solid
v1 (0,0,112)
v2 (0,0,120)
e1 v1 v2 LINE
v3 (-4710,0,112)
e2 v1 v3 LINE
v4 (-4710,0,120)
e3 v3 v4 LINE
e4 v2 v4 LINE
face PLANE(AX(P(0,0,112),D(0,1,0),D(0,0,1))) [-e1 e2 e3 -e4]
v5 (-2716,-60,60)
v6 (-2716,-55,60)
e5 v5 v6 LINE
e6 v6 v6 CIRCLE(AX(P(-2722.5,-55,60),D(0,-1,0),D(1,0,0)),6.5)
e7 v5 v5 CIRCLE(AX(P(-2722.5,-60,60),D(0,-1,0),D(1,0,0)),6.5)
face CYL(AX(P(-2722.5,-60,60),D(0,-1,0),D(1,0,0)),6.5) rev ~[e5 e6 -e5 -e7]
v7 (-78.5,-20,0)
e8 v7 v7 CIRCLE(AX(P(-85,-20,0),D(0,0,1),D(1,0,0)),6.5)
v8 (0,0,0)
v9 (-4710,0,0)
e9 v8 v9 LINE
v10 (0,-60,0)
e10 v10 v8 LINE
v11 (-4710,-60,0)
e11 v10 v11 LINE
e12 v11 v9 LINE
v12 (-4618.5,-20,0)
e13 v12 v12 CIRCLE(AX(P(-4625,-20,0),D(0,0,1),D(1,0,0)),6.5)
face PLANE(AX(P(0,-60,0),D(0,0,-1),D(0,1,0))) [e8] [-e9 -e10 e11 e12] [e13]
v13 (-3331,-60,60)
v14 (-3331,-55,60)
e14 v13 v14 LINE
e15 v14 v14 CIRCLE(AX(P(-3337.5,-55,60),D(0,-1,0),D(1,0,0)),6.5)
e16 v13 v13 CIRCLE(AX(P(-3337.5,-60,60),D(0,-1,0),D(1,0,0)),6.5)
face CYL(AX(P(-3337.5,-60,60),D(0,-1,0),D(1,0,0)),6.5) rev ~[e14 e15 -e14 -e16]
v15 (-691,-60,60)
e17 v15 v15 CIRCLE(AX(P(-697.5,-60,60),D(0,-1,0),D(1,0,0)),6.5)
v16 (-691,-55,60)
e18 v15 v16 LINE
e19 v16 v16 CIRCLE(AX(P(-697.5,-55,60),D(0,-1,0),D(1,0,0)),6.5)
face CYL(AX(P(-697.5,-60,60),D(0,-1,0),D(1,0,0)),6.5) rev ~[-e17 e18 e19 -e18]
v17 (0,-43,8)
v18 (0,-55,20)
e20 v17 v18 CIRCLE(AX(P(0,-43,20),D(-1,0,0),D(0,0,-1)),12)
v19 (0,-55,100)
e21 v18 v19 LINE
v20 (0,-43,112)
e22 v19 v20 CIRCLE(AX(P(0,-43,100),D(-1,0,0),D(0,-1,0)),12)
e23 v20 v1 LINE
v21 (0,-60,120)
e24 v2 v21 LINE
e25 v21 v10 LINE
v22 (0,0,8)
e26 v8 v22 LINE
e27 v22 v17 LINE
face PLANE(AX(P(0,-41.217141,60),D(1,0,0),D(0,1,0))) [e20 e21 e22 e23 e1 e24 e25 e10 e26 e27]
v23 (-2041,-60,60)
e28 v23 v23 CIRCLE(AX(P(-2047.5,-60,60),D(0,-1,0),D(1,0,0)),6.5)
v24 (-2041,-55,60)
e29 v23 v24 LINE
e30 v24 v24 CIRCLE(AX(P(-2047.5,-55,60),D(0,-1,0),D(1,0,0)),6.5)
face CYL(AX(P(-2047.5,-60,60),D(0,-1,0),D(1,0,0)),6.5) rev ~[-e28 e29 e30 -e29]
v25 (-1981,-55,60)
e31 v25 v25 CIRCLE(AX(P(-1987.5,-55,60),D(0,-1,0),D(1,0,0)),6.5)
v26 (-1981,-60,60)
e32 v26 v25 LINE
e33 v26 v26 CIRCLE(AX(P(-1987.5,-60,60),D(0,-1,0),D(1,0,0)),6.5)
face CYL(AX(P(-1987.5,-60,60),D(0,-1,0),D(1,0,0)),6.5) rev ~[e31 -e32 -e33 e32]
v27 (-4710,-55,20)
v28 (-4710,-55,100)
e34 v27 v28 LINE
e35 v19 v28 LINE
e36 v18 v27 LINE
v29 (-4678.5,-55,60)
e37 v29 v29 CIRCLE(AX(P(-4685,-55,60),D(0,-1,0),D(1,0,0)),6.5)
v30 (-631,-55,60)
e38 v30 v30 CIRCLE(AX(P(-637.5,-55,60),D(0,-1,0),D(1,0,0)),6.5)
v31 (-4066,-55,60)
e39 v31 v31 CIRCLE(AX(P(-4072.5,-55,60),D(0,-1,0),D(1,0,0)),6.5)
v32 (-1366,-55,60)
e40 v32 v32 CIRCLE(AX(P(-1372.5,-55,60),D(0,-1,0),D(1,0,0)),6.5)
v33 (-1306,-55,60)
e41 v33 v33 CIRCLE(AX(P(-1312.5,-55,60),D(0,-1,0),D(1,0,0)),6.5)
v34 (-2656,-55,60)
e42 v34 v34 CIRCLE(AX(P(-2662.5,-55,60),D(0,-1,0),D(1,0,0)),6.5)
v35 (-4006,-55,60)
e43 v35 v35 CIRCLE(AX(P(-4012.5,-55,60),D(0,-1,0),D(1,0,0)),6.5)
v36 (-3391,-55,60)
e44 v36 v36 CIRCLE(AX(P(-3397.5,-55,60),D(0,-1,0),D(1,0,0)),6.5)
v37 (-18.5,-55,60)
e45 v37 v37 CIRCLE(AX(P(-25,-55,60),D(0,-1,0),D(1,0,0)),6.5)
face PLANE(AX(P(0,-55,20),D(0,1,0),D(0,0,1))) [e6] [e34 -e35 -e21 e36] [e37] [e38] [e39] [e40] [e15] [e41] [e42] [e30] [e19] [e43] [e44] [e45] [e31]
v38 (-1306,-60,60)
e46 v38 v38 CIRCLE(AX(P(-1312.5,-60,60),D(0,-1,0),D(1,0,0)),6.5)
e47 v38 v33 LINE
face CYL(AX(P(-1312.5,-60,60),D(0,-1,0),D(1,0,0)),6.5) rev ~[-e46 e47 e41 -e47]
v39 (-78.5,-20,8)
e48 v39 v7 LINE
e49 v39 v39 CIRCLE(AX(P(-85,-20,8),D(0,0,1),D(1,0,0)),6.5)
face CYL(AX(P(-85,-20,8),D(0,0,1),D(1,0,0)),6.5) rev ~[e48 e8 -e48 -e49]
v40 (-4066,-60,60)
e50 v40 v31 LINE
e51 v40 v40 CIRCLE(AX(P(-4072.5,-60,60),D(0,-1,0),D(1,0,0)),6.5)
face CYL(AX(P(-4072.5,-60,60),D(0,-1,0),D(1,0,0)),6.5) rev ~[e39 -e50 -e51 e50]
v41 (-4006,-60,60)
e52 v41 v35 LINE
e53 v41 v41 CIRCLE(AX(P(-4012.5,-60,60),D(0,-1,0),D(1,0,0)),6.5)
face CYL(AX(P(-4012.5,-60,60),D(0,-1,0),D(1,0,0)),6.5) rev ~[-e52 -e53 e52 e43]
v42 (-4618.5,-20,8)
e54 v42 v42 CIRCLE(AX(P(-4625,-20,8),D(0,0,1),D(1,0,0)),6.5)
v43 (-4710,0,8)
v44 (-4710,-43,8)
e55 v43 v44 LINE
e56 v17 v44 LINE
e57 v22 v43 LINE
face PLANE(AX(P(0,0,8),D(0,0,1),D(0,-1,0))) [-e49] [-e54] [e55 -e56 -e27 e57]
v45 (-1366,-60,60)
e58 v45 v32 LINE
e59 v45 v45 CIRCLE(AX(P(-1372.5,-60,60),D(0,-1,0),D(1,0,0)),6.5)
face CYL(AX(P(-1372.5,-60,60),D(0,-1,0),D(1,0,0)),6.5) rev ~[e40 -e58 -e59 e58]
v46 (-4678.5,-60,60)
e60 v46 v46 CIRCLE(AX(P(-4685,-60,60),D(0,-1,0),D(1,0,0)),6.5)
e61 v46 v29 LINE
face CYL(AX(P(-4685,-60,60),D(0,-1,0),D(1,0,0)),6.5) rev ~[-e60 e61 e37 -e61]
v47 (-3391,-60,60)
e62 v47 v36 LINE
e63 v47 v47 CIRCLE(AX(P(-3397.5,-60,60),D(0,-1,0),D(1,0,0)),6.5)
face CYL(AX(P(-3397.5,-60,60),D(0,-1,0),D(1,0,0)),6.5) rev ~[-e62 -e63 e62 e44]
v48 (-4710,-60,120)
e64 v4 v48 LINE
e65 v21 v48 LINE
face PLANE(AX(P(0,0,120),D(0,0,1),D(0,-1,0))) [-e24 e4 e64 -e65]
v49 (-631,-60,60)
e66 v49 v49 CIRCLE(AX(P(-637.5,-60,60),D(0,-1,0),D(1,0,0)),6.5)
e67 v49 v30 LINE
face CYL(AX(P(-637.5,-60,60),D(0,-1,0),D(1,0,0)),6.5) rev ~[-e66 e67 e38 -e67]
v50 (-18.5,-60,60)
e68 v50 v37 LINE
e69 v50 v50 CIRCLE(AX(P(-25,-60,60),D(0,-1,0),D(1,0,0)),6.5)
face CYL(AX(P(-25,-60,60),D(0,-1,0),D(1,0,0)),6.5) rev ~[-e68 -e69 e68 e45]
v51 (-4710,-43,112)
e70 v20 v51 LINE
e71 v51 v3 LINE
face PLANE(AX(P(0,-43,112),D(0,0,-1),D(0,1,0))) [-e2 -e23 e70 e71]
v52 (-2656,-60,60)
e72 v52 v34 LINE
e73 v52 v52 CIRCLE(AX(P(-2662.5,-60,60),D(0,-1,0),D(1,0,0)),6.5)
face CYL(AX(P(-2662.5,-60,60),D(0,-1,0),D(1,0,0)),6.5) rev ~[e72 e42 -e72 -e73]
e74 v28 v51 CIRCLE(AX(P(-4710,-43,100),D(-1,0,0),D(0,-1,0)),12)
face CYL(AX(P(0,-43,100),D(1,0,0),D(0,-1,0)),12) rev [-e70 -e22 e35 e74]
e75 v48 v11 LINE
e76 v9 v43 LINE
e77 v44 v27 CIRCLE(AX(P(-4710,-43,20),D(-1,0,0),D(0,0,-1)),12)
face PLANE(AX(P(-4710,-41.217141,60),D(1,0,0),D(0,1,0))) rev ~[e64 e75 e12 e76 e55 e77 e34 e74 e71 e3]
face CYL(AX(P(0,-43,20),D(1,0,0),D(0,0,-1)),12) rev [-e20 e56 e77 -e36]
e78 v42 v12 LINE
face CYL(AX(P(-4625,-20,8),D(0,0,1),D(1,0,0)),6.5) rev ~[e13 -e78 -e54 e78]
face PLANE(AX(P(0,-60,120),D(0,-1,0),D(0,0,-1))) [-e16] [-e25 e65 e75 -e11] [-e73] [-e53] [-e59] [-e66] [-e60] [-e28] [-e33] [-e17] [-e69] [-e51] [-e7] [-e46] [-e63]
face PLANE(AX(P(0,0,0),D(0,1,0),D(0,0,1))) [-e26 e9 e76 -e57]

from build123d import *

# Parameters (mm, degrees)
F3_DEPTH = 4710
F4_R     = 6.5
F5_DEPTH = 8
F6_R     = 6.5
F7_DEPTH = 60.001


with BuildPart() as f3:
    # F2 (on Right) → F3 (new body)
    with BuildSketch(Plane.YZ):
        with BuildLine():
            Line((-60, 0), (0, 0))
            Line((0, 0), (0, 8))
            Line((0, 8), (-43, 8))
            ThreePointArc((-43, 8), (-51.4852813742, 11.5147186258), (-55, 20))
            Line((-55, 20), (-55, 100))
            ThreePointArc((-55, 100), (-51.4852813742, 108.4852813742), (-43, 112))
            Line((-43, 112), (0, 112))
            Line((0, 112), (0, 120))
            Line((0, 120), (-60, 120))
            Line((-60, 120), (-60, 0))
        make_face()
    extrude(amount=-F3_DEPTH)

    # F4 (on face) → F5 (cut, through all)
    with BuildSketch(Plane.XY.offset(8)):
        with Locations((-85, -20)):
            Circle(F4_R)
        with Locations((-4625, -20)):
            Circle(F4_R)
    extrude(amount=-F5_DEPTH, mode=Mode.SUBTRACT)

    # F6 (on face) → F7 (cut, through all)
    with BuildSketch(Plane.XZ.offset(60)):
        with Locations((-2047.5, 60)):
            Circle(F6_R)
        with Locations((-1987.5, 60)):
            Circle(F6_R)
        with Locations((-1372.5, 60)):
            Circle(F6_R)
        with Locations((-1312.5, 60)):
            Circle(F6_R)
        with Locations((-697.5, 60)):
            Circle(F6_R)
        with Locations((-637.5, 60)):
            Circle(F6_R)
        with Locations((-25, 60)):
            Circle(F6_R)
        with Locations((-2662.5, 60)):
            Circle(F6_R)
        with Locations((-2722.5, 60)):
            Circle(F6_R)
        with Locations((-3337.5, 60)):
            Circle(F6_R)
        with Locations((-3397.5, 60)):
            Circle(F6_R)
        with Locations((-4012.5, 60)):
            Circle(F6_R)
        with Locations((-4072.5, 60)):
            Circle(F6_R)
        with Locations((-4685, 60)):
            Circle(F6_R)
    extrude(amount=-F7_DEPTH, mode=Mode.SUBTRACT)


solid = f3.part
